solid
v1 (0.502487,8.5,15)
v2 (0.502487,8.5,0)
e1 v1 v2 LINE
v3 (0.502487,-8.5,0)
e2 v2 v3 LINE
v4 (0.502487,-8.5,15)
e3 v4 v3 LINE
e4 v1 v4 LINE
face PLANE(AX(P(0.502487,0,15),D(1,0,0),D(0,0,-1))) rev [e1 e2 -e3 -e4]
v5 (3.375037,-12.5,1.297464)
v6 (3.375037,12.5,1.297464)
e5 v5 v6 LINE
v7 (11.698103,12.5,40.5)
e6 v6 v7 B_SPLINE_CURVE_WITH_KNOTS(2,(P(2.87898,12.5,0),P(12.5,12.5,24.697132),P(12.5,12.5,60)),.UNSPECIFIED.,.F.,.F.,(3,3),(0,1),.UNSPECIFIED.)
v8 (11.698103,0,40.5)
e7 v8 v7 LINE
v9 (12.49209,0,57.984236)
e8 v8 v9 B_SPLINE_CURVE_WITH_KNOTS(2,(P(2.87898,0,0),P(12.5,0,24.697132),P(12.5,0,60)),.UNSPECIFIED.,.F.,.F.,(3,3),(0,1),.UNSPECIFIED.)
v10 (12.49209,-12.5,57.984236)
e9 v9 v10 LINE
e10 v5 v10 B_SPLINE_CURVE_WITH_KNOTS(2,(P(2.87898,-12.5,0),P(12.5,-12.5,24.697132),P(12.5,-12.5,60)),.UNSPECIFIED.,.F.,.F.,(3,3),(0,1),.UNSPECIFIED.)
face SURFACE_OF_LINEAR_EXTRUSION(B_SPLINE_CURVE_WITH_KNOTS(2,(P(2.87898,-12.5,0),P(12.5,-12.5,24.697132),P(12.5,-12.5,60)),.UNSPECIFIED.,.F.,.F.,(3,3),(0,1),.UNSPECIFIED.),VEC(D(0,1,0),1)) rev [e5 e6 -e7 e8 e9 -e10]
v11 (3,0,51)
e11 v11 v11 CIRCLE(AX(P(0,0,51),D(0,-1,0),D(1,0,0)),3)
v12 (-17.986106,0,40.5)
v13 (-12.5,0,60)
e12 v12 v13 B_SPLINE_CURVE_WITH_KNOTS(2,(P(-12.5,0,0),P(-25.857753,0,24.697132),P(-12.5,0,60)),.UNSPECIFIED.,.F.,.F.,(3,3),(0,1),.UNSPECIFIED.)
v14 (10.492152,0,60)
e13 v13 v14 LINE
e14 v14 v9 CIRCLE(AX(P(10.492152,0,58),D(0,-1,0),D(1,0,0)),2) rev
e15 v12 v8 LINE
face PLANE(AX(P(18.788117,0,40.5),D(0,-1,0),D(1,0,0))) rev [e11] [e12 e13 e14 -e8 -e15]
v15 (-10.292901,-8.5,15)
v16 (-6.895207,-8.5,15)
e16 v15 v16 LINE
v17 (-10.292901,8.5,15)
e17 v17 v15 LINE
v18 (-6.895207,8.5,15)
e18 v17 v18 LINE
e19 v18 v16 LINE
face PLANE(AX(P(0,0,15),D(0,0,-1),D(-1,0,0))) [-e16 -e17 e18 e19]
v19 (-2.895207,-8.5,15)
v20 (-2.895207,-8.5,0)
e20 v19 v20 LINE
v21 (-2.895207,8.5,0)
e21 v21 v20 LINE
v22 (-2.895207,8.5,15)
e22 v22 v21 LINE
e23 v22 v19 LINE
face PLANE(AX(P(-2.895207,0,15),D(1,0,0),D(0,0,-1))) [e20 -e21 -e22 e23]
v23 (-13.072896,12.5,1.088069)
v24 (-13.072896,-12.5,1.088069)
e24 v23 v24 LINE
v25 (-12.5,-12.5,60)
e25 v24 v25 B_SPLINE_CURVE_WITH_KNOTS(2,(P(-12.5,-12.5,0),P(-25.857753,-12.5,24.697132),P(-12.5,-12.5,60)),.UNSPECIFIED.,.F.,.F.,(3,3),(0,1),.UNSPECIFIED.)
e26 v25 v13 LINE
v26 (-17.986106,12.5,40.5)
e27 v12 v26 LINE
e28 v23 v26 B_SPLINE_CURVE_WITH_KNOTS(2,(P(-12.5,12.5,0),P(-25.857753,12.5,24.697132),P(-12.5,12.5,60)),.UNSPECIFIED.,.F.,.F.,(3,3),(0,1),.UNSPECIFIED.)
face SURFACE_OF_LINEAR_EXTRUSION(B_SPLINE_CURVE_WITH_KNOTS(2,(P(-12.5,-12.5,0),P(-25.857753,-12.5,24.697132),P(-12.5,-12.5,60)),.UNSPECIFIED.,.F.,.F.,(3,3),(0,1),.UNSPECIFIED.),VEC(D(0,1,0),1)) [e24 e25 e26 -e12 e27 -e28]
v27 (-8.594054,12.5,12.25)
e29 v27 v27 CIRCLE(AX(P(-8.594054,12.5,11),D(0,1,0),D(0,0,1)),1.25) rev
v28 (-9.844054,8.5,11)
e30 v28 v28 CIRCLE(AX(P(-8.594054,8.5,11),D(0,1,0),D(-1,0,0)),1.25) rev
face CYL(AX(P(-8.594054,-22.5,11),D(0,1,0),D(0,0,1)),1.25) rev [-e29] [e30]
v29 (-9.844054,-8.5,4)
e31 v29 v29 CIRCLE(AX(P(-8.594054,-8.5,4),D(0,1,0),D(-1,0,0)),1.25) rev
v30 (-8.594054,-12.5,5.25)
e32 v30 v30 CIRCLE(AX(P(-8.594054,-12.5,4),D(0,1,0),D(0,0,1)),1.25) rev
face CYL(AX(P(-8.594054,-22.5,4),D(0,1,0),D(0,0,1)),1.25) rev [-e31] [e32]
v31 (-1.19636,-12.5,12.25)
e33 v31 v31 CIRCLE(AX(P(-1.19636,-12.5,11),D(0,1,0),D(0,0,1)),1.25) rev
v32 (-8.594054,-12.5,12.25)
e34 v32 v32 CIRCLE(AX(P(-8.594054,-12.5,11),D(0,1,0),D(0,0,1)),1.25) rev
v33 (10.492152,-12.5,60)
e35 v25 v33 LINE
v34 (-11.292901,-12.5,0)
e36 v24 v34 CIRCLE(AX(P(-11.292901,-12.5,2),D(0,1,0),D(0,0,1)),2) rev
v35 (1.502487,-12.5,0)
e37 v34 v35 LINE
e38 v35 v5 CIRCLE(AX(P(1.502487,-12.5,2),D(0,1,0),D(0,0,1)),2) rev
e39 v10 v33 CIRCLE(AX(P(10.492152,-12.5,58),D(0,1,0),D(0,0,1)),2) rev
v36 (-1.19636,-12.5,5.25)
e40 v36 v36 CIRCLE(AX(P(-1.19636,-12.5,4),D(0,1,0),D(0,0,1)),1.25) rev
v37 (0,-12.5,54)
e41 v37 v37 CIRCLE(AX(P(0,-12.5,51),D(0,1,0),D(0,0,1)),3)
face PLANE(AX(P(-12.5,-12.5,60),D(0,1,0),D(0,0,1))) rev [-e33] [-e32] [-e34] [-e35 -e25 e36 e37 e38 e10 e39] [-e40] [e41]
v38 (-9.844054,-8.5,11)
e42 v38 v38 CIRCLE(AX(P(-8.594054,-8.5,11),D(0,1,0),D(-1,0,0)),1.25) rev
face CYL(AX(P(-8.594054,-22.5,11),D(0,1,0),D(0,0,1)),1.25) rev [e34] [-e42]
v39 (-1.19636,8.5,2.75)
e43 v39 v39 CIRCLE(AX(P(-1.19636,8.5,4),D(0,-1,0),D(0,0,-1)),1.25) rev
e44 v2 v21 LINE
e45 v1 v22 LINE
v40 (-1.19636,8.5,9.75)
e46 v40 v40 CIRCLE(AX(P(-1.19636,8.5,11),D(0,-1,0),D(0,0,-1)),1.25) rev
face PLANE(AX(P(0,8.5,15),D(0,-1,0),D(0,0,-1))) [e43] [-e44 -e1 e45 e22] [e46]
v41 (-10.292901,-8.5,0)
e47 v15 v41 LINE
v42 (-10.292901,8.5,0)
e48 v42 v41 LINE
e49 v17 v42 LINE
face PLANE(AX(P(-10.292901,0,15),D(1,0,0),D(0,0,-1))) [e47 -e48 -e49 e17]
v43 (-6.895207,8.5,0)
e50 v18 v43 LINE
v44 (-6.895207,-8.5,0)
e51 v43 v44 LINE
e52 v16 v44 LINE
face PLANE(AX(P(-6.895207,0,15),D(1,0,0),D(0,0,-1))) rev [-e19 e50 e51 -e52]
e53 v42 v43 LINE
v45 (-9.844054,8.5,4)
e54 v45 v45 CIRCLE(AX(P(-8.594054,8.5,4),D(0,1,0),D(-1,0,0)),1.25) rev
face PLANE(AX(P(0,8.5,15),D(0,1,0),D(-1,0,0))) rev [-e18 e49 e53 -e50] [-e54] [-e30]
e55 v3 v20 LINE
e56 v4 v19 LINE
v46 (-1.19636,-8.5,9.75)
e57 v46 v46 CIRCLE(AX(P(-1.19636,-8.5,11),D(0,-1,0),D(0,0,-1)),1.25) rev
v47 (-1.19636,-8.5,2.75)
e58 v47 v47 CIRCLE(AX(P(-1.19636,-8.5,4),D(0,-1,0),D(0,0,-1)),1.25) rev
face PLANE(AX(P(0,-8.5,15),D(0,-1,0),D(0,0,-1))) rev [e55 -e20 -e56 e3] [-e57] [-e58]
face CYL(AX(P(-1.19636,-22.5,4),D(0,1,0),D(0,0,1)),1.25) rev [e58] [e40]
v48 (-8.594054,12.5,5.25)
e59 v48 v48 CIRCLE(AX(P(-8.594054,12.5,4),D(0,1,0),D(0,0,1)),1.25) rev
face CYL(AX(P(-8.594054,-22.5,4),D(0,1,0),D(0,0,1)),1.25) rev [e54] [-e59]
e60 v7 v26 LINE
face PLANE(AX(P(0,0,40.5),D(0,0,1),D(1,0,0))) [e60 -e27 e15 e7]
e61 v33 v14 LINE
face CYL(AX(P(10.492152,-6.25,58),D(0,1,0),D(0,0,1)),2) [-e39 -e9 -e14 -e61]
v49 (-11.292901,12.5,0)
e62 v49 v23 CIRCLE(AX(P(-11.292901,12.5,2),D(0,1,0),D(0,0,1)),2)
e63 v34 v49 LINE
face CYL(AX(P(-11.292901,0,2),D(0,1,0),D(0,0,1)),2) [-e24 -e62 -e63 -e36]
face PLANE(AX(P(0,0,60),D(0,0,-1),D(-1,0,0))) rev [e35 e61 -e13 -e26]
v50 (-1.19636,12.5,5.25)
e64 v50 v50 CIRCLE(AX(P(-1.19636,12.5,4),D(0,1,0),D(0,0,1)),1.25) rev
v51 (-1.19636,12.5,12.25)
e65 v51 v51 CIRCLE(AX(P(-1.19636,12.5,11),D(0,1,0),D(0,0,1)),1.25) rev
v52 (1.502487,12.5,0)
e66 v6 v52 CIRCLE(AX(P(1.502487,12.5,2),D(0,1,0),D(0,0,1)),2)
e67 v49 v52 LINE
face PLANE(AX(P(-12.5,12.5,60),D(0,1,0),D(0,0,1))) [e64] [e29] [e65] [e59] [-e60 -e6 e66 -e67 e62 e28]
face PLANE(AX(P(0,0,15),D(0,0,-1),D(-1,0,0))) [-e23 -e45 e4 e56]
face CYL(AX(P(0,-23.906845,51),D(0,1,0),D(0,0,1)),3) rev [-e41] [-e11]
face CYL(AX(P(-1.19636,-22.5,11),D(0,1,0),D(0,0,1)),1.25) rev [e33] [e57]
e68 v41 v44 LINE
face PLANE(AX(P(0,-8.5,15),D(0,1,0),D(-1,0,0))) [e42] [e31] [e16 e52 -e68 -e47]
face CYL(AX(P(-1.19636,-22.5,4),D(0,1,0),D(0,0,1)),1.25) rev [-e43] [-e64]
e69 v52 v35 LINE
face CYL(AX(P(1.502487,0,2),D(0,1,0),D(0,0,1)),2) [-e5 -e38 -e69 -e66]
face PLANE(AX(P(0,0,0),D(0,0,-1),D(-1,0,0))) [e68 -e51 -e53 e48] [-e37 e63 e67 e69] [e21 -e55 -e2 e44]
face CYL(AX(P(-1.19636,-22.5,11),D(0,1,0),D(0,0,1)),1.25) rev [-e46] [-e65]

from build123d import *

# Parameters (mm, degrees)
SKETCH_1_W               = 25
SKETCH_1_H               = 25
EXTRUDE_1_DEPTH          = 60
EXTRUDE_4_DEPTH          = 25
CUT_EXTRUDE_START        = -25
CUT_EXTRUDE_4_DEPTH      = 25
SKETCH_4_W               = 41.211163986
SKETCH_4_H               = 12.5
CUT_EXTRUDE_2_DEPTH      = 19.5
SKETCH_2_R               = 3
CUT_EXTRUDE_1_DEPTH      = 36.406845426
FILLET_1_R               = 2
SKETCH_6_W               = 3.397693812
SKETCH_6_H               = 8.5
SKETCH_6_H_2             = 17
CUT_EXTRUDE_5_DEPTH      = 15
CUT_EXTRUDE_6_DEPTH      = 31
CUT_EXTRUDE_6_DEPTH_BACK = 10
SKETCH_7_R               = 1.25
FILLET_2_R               = 2


# Read off the part's stored shape, not the designer's step: 컷-돌출4
with BuildPart() as part:
    # 스케치1 → 보스-돌출1 (new body)
    with BuildSketch(Plane.XY):
        Rectangle(SKETCH_1_W, SKETCH_1_H)
    extrude(amount=EXTRUDE_1_DEPTH)

    # 스케치5 → 보스-돌출4 (add)
    with BuildSketch(Plane(origin=(0, 12.5, 0), x_dir=(1, 0, 0), z_dir=(0, 1, 0))):
        with BuildLine():
            add(Edge.make_bspline(
                [(2.878979614, 0), (12.5, -24.697131942), (12.5, -60)],
                knots=[0, 0, 0, 1, 1, 1], degree=2))
            Line((2.878979614, 0), (-12.5, 0))
            Line((-12.5, 0), (-12.5, -60))
            Line((-12.5, -60), (12.5, -60))
        make_face()
        with BuildLine():
            Line((-12.5, -60), (-12.5, 0))
            add(Edge.make_bspline(
                [(-12.5, 0), (-25.857752506, -24.697131942), (-12.5, -60)],
                knots=[0, 0, 0, 1, 1, 1], degree=2))
        make_face()
    extrude(amount=-EXTRUDE_4_DEPTH)

    # 컷-돌출4 outline → 컷-돌출4 (cut)
    with BuildSketch(Plane(origin=(0, 12.5, 0), x_dir=(1, 0, 0), z_dir=(0, 1, 0)).offset(CUT_EXTRUDE_START)):
        with BuildLine():
            Line((12.5, 0), (2.878979614, 0))
            add(Edge.make_bspline(
                [(2.878979614, 0), (12.5, -24.697131942), (12.5, -60)],
                knots=[0, 0, 0, 1, 1, 1], degree=2))
            Line((12.5, -60), (12.5, 0))
        make_face()
    extrude(amount=CUT_EXTRUDE_4_DEPTH, mode=Mode.SUBTRACT)

    # 스케치4 → 컷-돌출2 (cut)
    with BuildSketch(Plane.XY.offset(60)):
        with Locations((-1.817465194, 6.25)):
            Rectangle(SKETCH_4_W, SKETCH_4_H)
    extrude(amount=-CUT_EXTRUDE_2_DEPTH, mode=Mode.SUBTRACT)

    # 스케치2 → 컷-돌출1 (cut)
    with BuildSketch(Plane(origin=(0, 12.5, 0), x_dir=(1, 0, 0), z_dir=(0, 1, 0))):
        with Locations(Location((0, -51, 0), (0, 0, 270))):
            Circle(SKETCH_2_R)
    extrude(amount=-CUT_EXTRUDE_1_DEPTH, mode=Mode.SUBTRACT)

    # 필렛1
    fillet_1_edges = [part.edges().sort_by_distance(p)[0] for p in [
        (2.878979614, 0, 0),
        (-12.5, 0, 0),
    ]]
    fillet(fillet_1_edges, radius=FILLET_1_R)

    # 스케치6 → 컷-돌출5 (cut)
    with BuildSketch(Plane(origin=(0, 0, 0), x_dir=(-1, 0, 0), z_dir=(0, 0, -1))):
        with Locations((1.196360316, 4.25)):
            Rectangle(SKETCH_6_W, SKETCH_6_H)
        with Locations((1.196360316, -4.25)):
            Rectangle(SKETCH_6_W, SKETCH_6_H)
        with Locations((8.594054128, 0)):
            Rectangle(SKETCH_6_W, SKETCH_6_H_2)
    extrude(amount=-CUT_EXTRUDE_5_DEPTH, mode=Mode.SUBTRACT)

    # 스케치7 → 컷-돌출6 (cut, two sides: drawn at the far end of the back side and taken through both)
    with BuildSketch(Plane.XZ.offset(-8.5).offset(-CUT_EXTRUDE_6_DEPTH_BACK)):
        with Locations(Location((-1.196360316, 4, 0), (0, 0, 90))):
            Circle(SKETCH_7_R)
        with Locations(Location((-1.196360316, 11, 0), (0, 0, 90))):
            Circle(SKETCH_7_R)
        with Locations(Location((-8.594054128, 4, 0), (0, 0, 90))):
            Circle(SKETCH_7_R)
        with Locations(Location((-8.594054128, 11, 0), (0, 0, 90))):
            Circle(SKETCH_7_R)
    extrude(amount=CUT_EXTRUDE_6_DEPTH + CUT_EXTRUDE_6_DEPTH_BACK, mode=Mode.SUBTRACT)

    # 필렛2
    fillet_2_edges = [part.edges().sort_by_distance(p)[0] for p in [
        (12.5, -6.25, 60),
    ]]
    fillet(fillet_2_edges, radius=FILLET_2_R)


solid = part.part
